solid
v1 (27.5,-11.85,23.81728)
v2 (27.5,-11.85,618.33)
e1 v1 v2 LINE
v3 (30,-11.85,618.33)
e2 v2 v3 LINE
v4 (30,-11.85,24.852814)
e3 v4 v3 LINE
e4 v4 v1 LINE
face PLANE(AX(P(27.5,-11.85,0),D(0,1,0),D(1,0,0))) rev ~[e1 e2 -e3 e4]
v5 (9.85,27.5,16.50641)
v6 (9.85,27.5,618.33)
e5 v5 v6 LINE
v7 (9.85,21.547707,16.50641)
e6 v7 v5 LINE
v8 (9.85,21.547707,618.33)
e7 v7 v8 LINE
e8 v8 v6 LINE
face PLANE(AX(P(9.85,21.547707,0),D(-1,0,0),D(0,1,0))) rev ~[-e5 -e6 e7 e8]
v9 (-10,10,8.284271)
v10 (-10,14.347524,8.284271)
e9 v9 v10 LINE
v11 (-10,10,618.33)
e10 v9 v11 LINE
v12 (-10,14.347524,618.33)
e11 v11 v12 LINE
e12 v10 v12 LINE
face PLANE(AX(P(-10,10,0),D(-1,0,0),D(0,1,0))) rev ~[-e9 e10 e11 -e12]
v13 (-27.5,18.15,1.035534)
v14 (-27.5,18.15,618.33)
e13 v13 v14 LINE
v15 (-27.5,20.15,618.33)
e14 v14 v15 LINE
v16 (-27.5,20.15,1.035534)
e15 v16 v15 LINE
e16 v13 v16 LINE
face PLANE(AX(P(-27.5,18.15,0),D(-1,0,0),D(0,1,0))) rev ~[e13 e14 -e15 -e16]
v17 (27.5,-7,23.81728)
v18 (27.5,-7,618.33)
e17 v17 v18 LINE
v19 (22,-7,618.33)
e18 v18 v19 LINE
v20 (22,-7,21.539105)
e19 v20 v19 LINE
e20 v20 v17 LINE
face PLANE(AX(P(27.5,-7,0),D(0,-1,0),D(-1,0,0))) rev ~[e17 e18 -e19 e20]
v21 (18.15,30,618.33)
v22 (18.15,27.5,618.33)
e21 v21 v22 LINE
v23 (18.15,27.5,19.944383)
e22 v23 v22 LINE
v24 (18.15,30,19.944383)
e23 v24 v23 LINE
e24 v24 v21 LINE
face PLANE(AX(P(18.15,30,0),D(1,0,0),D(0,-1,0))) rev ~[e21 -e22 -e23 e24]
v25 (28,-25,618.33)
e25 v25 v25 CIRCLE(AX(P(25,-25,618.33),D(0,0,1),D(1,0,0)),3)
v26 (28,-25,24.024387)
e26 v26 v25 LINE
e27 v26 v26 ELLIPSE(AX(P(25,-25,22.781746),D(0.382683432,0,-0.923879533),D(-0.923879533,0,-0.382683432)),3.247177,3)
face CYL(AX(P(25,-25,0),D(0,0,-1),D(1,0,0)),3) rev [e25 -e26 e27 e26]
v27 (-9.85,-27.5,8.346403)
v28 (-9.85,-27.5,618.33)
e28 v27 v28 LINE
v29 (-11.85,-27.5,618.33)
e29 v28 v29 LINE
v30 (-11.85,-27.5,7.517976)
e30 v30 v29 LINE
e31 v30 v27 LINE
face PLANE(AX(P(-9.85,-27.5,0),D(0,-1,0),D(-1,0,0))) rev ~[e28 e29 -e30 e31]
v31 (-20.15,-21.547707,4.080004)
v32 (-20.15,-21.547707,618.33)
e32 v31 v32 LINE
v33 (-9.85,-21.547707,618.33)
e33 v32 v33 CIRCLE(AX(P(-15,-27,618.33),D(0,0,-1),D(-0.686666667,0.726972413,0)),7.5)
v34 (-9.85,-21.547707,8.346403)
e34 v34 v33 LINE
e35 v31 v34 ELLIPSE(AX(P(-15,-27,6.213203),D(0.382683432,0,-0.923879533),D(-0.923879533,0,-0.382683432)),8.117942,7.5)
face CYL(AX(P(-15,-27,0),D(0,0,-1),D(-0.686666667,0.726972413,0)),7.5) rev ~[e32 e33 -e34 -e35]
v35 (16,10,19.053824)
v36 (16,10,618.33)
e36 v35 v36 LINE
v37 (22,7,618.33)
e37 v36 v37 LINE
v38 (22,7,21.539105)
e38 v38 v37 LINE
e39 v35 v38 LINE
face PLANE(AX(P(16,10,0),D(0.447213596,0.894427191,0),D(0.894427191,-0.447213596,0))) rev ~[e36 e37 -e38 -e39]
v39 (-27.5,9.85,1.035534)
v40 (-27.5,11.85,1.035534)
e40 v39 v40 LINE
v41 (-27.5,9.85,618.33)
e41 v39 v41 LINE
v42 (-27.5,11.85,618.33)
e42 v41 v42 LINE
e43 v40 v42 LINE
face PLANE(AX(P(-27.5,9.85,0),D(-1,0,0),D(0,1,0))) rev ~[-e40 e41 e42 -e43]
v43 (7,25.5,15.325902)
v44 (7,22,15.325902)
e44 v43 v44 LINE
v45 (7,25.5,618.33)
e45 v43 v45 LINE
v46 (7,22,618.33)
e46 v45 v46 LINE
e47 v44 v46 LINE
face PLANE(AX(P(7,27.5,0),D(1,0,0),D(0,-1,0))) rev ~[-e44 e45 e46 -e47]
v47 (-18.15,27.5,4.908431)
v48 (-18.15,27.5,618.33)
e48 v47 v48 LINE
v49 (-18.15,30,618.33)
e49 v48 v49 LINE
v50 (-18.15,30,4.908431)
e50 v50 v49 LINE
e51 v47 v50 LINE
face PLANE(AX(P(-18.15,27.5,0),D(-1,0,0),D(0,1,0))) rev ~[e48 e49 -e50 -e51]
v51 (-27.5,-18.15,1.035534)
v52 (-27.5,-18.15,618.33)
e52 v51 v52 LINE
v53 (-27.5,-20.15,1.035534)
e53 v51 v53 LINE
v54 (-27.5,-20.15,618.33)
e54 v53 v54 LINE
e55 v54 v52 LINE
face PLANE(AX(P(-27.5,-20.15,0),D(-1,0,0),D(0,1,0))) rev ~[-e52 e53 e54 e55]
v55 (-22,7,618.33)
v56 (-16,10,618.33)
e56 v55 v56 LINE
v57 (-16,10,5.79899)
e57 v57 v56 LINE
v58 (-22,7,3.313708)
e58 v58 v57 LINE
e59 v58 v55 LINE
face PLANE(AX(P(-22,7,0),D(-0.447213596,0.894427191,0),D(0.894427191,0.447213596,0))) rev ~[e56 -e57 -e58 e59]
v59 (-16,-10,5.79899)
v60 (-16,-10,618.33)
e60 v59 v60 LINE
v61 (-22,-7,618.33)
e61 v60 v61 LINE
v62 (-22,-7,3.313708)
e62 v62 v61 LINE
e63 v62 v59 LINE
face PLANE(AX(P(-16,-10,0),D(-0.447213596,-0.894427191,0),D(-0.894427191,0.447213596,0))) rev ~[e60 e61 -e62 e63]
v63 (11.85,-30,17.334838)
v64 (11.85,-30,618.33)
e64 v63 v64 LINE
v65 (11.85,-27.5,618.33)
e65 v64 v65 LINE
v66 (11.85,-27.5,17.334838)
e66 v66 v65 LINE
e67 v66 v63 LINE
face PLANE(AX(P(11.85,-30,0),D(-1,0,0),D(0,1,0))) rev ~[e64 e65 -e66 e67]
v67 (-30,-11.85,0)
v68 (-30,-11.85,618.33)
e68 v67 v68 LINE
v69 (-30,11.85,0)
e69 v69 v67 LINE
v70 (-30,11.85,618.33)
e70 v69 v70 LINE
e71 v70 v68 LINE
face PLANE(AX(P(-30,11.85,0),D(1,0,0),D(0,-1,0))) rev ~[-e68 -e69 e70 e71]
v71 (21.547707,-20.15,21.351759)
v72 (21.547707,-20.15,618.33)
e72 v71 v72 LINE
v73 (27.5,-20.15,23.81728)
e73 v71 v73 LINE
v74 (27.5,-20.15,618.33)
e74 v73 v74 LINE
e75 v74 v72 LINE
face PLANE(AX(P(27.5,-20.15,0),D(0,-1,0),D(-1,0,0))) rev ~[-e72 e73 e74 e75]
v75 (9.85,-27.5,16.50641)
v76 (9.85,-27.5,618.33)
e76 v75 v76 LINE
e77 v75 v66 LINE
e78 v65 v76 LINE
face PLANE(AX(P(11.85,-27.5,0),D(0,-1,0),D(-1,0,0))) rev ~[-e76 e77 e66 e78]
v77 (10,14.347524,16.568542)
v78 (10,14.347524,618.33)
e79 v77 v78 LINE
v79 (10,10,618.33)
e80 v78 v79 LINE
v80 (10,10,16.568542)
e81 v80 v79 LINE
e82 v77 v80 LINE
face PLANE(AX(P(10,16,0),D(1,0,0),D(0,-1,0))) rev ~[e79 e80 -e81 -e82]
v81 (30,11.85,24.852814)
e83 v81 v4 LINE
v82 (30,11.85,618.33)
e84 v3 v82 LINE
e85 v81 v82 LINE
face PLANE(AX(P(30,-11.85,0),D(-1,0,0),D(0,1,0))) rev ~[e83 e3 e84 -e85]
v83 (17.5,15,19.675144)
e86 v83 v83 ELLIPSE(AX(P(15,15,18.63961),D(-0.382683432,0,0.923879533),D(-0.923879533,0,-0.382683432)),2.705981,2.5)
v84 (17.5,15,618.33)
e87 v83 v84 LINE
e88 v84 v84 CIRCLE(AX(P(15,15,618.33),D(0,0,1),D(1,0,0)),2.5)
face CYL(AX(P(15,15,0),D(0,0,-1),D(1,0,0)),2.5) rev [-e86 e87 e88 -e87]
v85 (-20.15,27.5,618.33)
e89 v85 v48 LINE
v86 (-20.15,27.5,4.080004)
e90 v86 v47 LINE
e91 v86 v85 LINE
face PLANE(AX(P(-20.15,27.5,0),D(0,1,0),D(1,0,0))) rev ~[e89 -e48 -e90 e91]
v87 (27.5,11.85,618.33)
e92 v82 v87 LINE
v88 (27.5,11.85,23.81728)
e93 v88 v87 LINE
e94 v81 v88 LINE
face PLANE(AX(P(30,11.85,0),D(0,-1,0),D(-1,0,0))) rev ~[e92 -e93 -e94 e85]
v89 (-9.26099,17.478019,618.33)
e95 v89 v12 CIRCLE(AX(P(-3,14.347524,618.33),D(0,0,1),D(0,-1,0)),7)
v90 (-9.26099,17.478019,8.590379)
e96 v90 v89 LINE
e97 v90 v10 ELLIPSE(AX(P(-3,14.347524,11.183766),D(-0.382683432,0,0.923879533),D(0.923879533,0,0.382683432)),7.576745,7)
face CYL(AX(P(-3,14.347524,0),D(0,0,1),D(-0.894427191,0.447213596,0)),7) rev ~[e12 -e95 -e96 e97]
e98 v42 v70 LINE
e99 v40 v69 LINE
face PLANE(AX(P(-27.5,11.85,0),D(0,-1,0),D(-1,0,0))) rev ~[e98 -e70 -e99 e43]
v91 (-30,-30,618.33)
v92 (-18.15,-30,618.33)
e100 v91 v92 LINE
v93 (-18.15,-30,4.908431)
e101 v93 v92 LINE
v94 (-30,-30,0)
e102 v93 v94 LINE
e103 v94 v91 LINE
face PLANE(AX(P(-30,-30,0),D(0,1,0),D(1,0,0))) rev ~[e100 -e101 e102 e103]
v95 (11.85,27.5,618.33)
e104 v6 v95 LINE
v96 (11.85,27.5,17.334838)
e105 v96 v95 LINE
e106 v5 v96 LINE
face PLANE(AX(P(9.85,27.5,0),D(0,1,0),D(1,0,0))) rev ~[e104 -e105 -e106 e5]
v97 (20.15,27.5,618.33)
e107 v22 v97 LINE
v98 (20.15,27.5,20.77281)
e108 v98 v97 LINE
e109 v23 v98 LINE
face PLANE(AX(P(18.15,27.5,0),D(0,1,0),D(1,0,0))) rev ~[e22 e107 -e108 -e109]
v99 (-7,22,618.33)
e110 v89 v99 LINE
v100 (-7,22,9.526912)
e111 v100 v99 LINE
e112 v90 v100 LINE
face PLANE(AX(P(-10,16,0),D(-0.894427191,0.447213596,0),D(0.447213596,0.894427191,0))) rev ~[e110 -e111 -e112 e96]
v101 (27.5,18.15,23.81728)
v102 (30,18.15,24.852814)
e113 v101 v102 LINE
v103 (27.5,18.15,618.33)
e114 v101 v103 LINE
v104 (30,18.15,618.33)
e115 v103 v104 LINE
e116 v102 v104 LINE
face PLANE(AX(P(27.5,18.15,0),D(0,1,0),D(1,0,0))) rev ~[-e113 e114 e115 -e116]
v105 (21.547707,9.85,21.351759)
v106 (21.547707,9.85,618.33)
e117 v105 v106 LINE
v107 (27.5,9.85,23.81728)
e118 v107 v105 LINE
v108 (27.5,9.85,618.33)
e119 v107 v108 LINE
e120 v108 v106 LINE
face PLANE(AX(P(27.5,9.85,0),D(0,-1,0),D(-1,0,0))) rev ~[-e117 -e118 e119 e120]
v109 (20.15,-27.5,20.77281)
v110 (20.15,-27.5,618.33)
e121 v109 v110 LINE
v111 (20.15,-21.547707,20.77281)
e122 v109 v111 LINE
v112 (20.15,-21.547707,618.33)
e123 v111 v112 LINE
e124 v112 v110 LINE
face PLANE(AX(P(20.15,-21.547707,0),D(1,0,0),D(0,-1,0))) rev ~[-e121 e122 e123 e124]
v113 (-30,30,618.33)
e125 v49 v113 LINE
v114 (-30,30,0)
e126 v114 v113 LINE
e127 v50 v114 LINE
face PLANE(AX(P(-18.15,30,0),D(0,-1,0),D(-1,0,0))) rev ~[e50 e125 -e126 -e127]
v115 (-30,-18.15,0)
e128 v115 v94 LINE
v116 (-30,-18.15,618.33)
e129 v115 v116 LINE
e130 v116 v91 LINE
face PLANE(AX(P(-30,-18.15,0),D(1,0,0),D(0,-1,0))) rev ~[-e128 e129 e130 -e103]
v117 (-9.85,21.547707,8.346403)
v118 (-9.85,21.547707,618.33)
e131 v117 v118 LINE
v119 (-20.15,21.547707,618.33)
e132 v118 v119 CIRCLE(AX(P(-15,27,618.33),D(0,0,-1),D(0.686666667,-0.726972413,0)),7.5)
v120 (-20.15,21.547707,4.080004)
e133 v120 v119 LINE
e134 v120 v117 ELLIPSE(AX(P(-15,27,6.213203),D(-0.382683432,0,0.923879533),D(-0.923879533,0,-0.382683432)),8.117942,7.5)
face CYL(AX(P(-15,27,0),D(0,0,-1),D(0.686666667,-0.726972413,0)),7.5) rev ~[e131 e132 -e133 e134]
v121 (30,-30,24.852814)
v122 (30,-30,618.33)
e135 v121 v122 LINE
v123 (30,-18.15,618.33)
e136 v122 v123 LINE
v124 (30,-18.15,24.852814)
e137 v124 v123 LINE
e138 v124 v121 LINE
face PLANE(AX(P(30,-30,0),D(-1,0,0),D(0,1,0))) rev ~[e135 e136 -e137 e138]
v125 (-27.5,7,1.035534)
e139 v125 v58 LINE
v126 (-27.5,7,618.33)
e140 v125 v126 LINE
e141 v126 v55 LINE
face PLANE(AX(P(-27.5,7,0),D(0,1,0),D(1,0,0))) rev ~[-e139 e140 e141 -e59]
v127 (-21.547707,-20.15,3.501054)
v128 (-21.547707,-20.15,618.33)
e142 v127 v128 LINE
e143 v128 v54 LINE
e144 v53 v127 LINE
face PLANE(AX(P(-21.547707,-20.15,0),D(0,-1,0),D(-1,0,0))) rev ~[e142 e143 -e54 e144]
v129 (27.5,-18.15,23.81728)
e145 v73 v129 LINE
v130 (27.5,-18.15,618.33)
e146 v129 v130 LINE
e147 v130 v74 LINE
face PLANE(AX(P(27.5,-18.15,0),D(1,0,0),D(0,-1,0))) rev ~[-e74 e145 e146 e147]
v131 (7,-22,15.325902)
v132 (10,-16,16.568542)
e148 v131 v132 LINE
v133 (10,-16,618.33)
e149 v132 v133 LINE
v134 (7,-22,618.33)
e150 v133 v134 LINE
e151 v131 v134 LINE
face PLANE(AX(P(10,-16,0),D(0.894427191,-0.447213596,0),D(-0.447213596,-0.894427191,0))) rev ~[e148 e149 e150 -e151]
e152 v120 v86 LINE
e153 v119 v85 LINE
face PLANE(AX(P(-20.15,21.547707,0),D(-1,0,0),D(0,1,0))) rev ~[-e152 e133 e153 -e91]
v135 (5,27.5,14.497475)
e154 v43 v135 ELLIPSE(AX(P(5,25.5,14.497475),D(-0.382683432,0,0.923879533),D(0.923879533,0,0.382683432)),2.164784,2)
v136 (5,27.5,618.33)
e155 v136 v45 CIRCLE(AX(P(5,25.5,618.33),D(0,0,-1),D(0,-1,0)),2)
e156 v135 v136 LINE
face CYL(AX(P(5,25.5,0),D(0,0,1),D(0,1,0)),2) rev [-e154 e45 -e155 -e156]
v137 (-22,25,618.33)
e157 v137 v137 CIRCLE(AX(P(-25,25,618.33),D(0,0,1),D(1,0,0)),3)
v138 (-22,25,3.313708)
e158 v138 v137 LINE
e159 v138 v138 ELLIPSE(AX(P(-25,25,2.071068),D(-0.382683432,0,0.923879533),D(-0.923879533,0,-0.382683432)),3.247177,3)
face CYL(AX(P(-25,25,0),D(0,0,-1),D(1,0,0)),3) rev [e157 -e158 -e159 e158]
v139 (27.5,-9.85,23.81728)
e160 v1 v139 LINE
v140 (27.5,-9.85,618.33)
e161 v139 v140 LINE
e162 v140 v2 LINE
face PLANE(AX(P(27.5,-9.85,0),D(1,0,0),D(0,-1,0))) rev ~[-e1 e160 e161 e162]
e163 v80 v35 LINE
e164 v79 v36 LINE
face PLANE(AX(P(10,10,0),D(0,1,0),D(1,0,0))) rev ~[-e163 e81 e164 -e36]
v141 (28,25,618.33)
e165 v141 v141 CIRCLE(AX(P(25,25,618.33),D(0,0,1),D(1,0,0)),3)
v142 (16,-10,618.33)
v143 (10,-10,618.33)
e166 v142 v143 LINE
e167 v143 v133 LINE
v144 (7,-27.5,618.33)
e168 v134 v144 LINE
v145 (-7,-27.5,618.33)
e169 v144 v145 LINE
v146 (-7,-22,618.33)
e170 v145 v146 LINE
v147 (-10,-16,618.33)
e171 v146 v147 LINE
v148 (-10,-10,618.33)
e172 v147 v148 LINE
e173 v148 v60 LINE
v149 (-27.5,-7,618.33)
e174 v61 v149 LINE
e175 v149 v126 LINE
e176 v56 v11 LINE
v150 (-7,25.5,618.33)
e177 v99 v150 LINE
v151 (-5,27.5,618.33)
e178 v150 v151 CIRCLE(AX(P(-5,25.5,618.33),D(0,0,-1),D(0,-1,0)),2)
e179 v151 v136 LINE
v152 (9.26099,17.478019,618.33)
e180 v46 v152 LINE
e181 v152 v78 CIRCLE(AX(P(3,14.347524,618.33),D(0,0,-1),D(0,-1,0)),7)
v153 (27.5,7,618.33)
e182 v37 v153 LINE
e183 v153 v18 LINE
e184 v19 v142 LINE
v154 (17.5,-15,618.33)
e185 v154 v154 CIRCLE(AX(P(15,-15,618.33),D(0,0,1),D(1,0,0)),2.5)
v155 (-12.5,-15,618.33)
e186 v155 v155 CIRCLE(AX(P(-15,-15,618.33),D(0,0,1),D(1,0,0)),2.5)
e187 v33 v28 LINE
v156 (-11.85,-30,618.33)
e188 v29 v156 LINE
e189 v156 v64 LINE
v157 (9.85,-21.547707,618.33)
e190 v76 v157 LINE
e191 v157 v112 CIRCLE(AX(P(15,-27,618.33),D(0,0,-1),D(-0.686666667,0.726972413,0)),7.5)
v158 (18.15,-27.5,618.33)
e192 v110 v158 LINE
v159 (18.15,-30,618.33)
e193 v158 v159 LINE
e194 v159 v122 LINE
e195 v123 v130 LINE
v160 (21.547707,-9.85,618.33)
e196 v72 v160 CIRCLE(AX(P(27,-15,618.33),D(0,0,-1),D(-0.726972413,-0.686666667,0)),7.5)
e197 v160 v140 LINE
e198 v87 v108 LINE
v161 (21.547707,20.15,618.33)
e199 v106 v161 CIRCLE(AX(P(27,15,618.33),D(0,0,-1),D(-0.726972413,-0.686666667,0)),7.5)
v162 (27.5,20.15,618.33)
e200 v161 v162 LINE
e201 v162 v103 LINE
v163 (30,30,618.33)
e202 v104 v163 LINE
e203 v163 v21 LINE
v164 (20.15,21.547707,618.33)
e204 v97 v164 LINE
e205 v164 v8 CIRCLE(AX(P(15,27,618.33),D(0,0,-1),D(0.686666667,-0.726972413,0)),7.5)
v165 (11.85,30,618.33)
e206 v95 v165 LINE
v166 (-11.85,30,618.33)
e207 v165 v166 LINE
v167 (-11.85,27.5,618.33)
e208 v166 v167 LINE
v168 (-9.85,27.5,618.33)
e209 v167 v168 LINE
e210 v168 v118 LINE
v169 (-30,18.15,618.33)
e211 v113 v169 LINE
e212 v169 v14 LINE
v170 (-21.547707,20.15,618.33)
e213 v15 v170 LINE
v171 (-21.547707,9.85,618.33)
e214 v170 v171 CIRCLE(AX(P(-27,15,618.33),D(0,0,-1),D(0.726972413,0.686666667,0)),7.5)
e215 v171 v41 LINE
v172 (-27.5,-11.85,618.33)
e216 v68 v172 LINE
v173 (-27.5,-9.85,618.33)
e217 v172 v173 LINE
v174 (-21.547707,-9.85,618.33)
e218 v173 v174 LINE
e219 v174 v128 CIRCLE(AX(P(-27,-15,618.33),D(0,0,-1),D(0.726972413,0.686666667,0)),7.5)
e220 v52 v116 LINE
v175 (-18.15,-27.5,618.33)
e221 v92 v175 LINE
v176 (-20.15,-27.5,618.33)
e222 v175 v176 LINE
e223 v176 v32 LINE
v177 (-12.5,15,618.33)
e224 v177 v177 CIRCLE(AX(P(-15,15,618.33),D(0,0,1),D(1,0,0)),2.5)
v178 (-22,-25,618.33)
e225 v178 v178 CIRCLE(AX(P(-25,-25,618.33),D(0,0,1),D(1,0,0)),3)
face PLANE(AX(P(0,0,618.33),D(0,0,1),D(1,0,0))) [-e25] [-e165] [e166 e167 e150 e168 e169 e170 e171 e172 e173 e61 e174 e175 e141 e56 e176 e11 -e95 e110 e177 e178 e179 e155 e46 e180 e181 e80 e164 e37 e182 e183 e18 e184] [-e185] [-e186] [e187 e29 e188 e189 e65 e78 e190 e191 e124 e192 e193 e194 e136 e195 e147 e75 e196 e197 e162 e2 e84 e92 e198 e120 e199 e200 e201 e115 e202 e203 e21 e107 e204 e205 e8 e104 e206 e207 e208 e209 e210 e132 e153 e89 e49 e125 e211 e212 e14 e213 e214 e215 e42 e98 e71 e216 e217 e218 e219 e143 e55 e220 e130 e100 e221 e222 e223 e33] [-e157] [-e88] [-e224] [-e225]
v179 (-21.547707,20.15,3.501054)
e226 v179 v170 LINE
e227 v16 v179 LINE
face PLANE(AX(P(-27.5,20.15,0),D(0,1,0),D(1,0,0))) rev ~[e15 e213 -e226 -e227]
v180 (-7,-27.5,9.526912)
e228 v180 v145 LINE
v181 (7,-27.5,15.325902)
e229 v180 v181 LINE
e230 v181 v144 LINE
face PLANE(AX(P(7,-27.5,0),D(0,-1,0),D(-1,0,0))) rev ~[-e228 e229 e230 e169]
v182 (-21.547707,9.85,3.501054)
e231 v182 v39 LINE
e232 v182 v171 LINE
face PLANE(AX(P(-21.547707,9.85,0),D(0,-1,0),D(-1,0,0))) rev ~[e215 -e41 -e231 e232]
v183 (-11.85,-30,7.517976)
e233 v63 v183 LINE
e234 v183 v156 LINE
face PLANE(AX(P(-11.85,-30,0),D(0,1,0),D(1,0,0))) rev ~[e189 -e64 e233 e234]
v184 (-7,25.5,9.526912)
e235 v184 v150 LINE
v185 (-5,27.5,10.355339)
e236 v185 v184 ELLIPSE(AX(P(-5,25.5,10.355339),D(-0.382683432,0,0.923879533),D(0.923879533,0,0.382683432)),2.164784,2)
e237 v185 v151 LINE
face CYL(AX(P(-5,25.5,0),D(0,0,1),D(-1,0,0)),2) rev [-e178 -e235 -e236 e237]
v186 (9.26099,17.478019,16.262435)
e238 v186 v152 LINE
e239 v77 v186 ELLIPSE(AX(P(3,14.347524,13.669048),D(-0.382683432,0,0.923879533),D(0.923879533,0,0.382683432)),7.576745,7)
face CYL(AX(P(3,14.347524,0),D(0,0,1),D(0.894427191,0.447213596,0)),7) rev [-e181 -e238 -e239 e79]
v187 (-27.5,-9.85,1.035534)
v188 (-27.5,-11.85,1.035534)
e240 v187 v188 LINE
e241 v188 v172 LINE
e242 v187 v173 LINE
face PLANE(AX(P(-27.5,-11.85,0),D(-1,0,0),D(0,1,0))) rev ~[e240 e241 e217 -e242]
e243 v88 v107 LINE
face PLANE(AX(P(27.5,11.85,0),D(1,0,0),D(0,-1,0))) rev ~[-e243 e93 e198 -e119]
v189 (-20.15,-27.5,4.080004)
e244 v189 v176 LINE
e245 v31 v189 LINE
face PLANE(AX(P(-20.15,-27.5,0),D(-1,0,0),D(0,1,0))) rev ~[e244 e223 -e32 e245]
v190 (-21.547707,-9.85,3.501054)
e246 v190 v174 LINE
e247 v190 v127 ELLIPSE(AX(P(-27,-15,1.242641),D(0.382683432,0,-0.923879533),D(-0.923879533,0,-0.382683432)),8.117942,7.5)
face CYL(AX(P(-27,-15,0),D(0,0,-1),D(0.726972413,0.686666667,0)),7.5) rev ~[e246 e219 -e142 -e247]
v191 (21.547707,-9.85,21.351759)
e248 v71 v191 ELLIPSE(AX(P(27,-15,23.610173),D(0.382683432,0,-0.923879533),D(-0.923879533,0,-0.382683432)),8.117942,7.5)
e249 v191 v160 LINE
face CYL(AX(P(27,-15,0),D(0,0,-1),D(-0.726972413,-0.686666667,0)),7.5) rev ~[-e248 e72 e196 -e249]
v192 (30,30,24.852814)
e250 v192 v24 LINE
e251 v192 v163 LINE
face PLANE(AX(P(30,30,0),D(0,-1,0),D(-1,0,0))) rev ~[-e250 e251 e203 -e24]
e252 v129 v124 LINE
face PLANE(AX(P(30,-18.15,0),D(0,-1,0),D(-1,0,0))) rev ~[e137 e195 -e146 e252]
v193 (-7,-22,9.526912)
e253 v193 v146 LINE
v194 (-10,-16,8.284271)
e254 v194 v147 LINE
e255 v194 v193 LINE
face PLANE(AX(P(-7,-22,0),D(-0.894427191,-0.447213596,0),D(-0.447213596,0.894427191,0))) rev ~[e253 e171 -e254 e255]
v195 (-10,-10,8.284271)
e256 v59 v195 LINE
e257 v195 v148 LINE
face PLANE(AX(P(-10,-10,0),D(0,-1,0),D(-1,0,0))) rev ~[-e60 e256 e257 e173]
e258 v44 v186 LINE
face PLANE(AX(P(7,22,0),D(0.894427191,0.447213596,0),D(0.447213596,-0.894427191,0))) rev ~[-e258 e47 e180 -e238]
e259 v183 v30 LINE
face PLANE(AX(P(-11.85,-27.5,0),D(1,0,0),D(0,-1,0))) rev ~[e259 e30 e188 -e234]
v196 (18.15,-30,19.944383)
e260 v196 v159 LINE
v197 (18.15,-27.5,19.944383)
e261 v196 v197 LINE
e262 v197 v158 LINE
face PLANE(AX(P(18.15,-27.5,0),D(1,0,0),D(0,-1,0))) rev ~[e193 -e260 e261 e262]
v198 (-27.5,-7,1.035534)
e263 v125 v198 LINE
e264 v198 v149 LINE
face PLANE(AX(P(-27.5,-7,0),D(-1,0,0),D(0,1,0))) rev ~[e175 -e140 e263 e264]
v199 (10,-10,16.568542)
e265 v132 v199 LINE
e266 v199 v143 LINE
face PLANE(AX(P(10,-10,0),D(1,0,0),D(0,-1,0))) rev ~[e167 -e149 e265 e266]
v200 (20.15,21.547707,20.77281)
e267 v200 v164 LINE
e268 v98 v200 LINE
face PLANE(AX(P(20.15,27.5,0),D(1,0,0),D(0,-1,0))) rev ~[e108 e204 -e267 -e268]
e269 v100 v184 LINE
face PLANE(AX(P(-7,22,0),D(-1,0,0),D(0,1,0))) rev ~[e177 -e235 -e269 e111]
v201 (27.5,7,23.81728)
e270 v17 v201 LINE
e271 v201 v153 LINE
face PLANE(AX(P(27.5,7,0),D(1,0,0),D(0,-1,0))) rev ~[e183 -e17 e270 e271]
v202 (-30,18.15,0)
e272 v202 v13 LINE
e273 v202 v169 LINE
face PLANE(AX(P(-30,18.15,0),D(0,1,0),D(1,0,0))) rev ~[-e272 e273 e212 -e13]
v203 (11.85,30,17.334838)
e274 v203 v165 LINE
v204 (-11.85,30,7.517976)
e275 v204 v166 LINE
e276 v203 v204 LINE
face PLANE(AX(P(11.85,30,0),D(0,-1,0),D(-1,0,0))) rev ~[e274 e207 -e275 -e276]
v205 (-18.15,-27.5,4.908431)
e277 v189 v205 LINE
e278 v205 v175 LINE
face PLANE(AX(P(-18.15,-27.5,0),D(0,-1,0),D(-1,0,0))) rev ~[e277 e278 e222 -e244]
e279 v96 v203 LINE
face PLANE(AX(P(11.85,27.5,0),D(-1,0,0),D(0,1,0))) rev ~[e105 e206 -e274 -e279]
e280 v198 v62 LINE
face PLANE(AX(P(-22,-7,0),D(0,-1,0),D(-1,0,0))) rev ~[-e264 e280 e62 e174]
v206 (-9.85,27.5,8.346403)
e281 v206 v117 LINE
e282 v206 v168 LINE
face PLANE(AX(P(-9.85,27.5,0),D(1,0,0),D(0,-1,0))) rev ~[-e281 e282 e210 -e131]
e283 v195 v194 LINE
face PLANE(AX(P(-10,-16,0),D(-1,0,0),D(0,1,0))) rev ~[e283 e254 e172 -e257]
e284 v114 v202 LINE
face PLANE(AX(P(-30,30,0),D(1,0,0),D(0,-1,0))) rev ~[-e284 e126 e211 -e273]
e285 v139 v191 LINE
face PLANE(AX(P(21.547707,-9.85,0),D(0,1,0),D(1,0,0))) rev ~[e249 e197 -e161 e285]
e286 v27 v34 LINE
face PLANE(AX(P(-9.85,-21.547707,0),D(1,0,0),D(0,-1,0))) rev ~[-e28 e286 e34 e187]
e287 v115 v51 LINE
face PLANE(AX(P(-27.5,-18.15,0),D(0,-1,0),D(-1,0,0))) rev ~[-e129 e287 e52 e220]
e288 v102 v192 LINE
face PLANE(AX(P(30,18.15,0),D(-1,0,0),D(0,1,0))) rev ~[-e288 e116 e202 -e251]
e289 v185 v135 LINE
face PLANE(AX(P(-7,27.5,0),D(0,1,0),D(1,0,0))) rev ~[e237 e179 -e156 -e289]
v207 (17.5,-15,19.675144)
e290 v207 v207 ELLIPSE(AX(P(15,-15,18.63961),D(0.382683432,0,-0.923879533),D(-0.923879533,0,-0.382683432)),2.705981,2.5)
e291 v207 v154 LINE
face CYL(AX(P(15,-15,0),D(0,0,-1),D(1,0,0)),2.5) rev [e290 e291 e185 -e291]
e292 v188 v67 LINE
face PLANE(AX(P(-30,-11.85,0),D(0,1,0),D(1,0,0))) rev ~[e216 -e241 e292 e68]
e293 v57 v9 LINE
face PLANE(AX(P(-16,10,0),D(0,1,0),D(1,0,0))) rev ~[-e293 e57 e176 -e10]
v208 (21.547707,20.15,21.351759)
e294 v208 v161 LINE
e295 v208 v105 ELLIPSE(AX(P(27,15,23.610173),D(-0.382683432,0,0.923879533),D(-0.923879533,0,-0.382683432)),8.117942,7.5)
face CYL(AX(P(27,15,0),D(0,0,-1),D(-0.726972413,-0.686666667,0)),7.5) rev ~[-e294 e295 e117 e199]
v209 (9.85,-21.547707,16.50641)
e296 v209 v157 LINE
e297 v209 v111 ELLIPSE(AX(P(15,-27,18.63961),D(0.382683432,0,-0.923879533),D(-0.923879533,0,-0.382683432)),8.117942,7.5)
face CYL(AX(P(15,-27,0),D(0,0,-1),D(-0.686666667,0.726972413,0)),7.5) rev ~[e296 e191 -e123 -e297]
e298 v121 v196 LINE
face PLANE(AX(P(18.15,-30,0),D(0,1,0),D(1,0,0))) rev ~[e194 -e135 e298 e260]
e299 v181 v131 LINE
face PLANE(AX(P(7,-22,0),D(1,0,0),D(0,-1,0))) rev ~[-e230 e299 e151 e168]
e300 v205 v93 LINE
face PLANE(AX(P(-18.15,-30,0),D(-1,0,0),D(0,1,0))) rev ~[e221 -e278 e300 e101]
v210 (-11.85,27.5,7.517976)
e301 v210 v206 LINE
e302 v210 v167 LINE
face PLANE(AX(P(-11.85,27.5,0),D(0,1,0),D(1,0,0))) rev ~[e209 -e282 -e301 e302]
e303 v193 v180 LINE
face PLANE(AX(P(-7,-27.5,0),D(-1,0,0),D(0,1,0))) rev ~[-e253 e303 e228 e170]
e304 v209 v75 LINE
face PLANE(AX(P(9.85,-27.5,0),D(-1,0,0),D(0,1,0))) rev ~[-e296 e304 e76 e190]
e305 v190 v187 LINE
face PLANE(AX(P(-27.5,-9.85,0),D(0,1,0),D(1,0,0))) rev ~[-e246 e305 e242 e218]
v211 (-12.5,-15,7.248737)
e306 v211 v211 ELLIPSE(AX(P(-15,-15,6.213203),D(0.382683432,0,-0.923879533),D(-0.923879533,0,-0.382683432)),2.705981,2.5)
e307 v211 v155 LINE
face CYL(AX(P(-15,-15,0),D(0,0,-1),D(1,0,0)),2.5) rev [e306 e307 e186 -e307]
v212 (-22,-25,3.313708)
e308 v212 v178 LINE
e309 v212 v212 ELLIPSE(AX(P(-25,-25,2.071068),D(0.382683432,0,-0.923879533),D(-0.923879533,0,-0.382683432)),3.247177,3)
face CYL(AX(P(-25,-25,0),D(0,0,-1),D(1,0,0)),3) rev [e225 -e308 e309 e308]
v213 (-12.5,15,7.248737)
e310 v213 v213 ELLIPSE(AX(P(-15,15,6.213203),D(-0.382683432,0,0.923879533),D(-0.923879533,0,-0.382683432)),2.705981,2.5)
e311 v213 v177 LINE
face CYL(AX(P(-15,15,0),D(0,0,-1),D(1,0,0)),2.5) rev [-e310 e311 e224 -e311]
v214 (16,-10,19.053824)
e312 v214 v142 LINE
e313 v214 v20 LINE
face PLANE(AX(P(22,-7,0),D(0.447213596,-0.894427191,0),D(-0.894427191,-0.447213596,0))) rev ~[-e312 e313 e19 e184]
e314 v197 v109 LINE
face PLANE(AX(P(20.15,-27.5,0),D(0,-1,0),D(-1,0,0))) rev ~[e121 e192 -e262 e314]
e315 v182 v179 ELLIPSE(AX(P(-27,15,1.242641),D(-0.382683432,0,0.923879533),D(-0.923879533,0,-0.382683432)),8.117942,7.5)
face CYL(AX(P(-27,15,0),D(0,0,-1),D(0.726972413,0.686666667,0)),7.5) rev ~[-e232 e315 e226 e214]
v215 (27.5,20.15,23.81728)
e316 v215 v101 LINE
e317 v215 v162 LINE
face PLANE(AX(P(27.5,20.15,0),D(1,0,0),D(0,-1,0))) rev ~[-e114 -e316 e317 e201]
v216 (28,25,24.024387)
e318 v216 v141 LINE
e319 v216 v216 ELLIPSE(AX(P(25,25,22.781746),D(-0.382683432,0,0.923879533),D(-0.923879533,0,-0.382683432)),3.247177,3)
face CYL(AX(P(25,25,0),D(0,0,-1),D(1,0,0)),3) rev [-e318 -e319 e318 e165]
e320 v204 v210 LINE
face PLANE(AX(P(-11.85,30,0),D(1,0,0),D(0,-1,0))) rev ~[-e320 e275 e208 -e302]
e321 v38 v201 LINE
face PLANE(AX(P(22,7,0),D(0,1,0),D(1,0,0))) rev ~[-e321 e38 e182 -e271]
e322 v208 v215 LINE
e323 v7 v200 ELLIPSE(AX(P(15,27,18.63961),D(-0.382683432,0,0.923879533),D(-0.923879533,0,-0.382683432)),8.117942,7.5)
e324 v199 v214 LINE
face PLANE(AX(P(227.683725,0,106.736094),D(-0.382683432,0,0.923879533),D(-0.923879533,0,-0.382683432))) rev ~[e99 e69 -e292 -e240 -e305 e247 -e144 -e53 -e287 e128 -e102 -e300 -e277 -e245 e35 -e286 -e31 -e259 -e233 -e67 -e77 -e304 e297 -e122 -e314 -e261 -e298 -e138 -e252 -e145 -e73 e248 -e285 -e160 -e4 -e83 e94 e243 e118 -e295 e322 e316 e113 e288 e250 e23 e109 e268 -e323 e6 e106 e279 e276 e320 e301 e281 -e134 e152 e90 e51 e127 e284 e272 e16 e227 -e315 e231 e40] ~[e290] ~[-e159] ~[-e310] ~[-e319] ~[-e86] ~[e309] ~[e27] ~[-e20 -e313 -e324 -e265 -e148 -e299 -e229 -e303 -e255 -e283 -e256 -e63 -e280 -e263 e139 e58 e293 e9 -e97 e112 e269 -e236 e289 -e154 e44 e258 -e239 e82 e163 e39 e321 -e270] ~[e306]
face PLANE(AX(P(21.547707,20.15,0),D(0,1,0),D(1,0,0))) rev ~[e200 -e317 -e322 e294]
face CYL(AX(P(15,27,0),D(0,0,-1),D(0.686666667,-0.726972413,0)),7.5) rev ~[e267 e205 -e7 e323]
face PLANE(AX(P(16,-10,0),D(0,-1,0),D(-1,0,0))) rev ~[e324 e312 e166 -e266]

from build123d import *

# Parameters (mm, degrees)
F0_R          = 3
F0_R_2        = 2.5
F1_DEPTH      = 618.33
F2_R          = 2
F3_R          = 7
F5_DEPTH      = 30
F5_DEPTH_BACK = 30


# Not quite as in the source:
# - a feature names something its author has since deleted; it is built from what else it names


with BuildPart() as f1:
    # F0 (on Top) → F1 (new body)
    with BuildSketch(Plane.XY):
        with BuildLine():
            Line((18.15, -30), (30, -30))
            Line((30, -30), (30, -18.15))
            Line((30, -18.15), (27.5, -18.15))
            Line((27.5, -18.15), (27.5, -20.15))
            Line((27.5, -20.15), (21.5477069044, -20.15))
            ThreePointArc((21.5477069044, -20.15), (19.5, -15), (21.5477069044, -9.85))
            Line((21.5477069044, -9.85), (27.5, -9.85))
            Line((27.5, -9.85), (27.5, -11.85))
            Line((27.5, -11.85), (30, -11.85))
            Line((30, -11.85), (30, 11.85))
            Line((30, 11.85), (27.5, 11.85))
            Line((27.5, 11.85), (27.5, 9.85))
            Line((27.5, 9.85), (21.5477069044, 9.85))
            ThreePointArc((21.5477069044, 9.85), (19.5, 15), (21.5477069044, 20.15))
            Line((21.5477069044, 20.15), (27.5, 20.15))
            Line((27.5, 20.15), (27.5, 18.15))
            Line((27.5, 18.15), (30, 18.15))
            Line((30, 18.15), (30, 30))
            Line((30, 30), (18.15, 30))
            Line((18.15, 30), (18.15, 27.5))
            Line((18.15, 27.5), (20.15, 27.5))
            Line((20.15, 27.5), (20.15, 21.5477069044))
            ThreePointArc((20.15, 21.5477069044), (15, 19.5), (9.85, 21.5477069044))
            Line((9.85, 21.5477069044), (9.85, 27.5))
            Line((9.85, 27.5), (11.85, 27.5))
            Line((11.85, 27.5), (11.85, 30))
            Line((11.85, 30), (-11.85, 30))
            Line((-11.85, 30), (-11.85, 27.5))
            Line((-11.85, 27.5), (-9.85, 27.5))
            Line((-9.85, 27.5), (-9.85, 21.5477069044))
            ThreePointArc((-9.85, 21.5477069044), (-15, 19.5), (-20.15, 21.5477069044))
            Line((-20.15, 21.5477069044), (-20.15, 27.5))
            Line((-20.15, 27.5), (-18.15, 27.5))
            Line((-18.15, 27.5), (-18.15, 30))
            Line((-18.15, 30), (-30, 30))
            Line((-30, 30), (-30, 18.15))
            Line((-30, 18.15), (-27.5, 18.15))
            Line((-27.5, 18.15), (-27.5, 20.15))
            Line((-27.5, 20.15), (-21.5477069044, 20.15))
            ThreePointArc((-21.5477069044, 20.15), (-19.5, 15), (-21.5477069044, 9.85))
            Line((-21.5477069044, 9.85), (-27.5, 9.85))
            Line((-27.5, 9.85), (-27.5, 11.85))
            Line((-27.5, 11.85), (-30, 11.85))
            Line((-30, 11.85), (-30, -11.85))
            Line((-30, -11.85), (-27.5, -11.85))
            Line((-27.5, -11.85), (-27.5, -9.85))
            Line((-27.5, -9.85), (-21.5477069044, -9.85))
            ThreePointArc((-21.5477069044, -9.85), (-19.5, -15), (-21.5477069044, -20.15))
            Line((-21.5477069044, -20.15), (-27.5, -20.15))
            Line((-27.5, -20.15), (-27.5, -18.15))
            Line((-27.5, -18.15), (-30, -18.15))
            Line((-30, -18.15), (-30, -30))
            Line((-30, -30), (-18.15, -30))
            Line((-18.15, -30), (-18.15, -27.5))
            Line((-18.15, -27.5), (-20.15, -27.5))
            Line((-20.15, -27.5), (-20.15, -21.5477069044))
            ThreePointArc((-20.15, -21.5477069044), (-15, -19.5), (-9.85, -21.5477069044))
            Line((-9.85, -21.5477069044), (-9.85, -27.5))
            Line((-9.85, -27.5), (-11.85, -27.5))
            Line((-11.85, -27.5), (-11.85, -30))
            Line((-11.85, -30), (11.85, -30))
            Line((11.85, -30), (11.85, -27.5))
            Line((11.85, -27.5), (9.85, -27.5))
            Line((9.85, -27.5), (9.85, -21.5477069044))
            ThreePointArc((9.85, -21.5477069044), (15, -19.5), (20.15, -21.5477069044))
            Line((20.15, -21.5477069044), (20.15, -27.5))
            Line((20.15, -27.5), (18.15, -27.5))
            Line((18.15, -27.5), (18.15, -30))
        make_face()
        with Locations((-25, -25)):
            Circle(F0_R, mode=Mode.SUBTRACT)
        with Locations((-15, -15)):
            Circle(F0_R_2, mode=Mode.SUBTRACT)
        with Locations((25, -25)):
            Circle(F0_R, mode=Mode.SUBTRACT)
        with Locations((15, -15)):
            Circle(F0_R_2, mode=Mode.SUBTRACT)
        with Locations((-25, 25)):
            Circle(F0_R, mode=Mode.SUBTRACT)
        with Locations((-15, 15)):
            Circle(F0_R_2, mode=Mode.SUBTRACT)
        Polygon((-7, 22), (-7, 27.5), (0, 27.5), (7, 27.5), (7, 22), (10, 16), (10, 10), (16, 10), (22, 7), (27.5, 7), (27.5, 0), (27.5, -7), (22, -7), (16, -10), (10, -10), (10, -16), (7, -22), (7, -27.5), (0, -27.5), (-7, -27.5), (-7, -22), (-10, -16), (-10, -10), (-16, -10), (-22, -7), (-27.5, -7), (-27.5, 0), (-27.5, 7), (-22, 7), (-16, 10), (-10, 10), (-10, 16), align=None, mode=Mode.SUBTRACT)
        with Locations((15, 15)):
            Circle(F0_R_2, mode=Mode.SUBTRACT)
        with Locations((25, 25)):
            Circle(F0_R, mode=Mode.SUBTRACT)
    extrude(amount=F1_DEPTH)

    # F2
    f2_edges = [f1.edges().sort_by_distance(p)[0] for p in [
        (-7, 27.5, 309.165),
        (7, 27.5, 309.165),
    ]]
    fillet(f2_edges, radius=F2_R)

    # F3
    f3_edges = [f1.edges().sort_by_distance(p)[0] for p in [
        (-10, 16, 309.165),
        (10, 16, 309.165),
    ]]
    fillet(f3_edges, radius=F3_R)

    # F4 (on Front) → F5 (cut, two sides)
    with BuildSketch(Plane.XZ) as f5_sk:
        Polygon((227.6837248597, 106.7360936397), (-30, 0), (35.1751396755, -157.3467061341), (292.8588645352, -50.6106124944), align=None)
    extrude(amount=F5_DEPTH, mode=Mode.SUBTRACT)
    extrude(f5_sk.sketch, amount=-F5_DEPTH_BACK, mode=Mode.SUBTRACT)


solid = f1.part
